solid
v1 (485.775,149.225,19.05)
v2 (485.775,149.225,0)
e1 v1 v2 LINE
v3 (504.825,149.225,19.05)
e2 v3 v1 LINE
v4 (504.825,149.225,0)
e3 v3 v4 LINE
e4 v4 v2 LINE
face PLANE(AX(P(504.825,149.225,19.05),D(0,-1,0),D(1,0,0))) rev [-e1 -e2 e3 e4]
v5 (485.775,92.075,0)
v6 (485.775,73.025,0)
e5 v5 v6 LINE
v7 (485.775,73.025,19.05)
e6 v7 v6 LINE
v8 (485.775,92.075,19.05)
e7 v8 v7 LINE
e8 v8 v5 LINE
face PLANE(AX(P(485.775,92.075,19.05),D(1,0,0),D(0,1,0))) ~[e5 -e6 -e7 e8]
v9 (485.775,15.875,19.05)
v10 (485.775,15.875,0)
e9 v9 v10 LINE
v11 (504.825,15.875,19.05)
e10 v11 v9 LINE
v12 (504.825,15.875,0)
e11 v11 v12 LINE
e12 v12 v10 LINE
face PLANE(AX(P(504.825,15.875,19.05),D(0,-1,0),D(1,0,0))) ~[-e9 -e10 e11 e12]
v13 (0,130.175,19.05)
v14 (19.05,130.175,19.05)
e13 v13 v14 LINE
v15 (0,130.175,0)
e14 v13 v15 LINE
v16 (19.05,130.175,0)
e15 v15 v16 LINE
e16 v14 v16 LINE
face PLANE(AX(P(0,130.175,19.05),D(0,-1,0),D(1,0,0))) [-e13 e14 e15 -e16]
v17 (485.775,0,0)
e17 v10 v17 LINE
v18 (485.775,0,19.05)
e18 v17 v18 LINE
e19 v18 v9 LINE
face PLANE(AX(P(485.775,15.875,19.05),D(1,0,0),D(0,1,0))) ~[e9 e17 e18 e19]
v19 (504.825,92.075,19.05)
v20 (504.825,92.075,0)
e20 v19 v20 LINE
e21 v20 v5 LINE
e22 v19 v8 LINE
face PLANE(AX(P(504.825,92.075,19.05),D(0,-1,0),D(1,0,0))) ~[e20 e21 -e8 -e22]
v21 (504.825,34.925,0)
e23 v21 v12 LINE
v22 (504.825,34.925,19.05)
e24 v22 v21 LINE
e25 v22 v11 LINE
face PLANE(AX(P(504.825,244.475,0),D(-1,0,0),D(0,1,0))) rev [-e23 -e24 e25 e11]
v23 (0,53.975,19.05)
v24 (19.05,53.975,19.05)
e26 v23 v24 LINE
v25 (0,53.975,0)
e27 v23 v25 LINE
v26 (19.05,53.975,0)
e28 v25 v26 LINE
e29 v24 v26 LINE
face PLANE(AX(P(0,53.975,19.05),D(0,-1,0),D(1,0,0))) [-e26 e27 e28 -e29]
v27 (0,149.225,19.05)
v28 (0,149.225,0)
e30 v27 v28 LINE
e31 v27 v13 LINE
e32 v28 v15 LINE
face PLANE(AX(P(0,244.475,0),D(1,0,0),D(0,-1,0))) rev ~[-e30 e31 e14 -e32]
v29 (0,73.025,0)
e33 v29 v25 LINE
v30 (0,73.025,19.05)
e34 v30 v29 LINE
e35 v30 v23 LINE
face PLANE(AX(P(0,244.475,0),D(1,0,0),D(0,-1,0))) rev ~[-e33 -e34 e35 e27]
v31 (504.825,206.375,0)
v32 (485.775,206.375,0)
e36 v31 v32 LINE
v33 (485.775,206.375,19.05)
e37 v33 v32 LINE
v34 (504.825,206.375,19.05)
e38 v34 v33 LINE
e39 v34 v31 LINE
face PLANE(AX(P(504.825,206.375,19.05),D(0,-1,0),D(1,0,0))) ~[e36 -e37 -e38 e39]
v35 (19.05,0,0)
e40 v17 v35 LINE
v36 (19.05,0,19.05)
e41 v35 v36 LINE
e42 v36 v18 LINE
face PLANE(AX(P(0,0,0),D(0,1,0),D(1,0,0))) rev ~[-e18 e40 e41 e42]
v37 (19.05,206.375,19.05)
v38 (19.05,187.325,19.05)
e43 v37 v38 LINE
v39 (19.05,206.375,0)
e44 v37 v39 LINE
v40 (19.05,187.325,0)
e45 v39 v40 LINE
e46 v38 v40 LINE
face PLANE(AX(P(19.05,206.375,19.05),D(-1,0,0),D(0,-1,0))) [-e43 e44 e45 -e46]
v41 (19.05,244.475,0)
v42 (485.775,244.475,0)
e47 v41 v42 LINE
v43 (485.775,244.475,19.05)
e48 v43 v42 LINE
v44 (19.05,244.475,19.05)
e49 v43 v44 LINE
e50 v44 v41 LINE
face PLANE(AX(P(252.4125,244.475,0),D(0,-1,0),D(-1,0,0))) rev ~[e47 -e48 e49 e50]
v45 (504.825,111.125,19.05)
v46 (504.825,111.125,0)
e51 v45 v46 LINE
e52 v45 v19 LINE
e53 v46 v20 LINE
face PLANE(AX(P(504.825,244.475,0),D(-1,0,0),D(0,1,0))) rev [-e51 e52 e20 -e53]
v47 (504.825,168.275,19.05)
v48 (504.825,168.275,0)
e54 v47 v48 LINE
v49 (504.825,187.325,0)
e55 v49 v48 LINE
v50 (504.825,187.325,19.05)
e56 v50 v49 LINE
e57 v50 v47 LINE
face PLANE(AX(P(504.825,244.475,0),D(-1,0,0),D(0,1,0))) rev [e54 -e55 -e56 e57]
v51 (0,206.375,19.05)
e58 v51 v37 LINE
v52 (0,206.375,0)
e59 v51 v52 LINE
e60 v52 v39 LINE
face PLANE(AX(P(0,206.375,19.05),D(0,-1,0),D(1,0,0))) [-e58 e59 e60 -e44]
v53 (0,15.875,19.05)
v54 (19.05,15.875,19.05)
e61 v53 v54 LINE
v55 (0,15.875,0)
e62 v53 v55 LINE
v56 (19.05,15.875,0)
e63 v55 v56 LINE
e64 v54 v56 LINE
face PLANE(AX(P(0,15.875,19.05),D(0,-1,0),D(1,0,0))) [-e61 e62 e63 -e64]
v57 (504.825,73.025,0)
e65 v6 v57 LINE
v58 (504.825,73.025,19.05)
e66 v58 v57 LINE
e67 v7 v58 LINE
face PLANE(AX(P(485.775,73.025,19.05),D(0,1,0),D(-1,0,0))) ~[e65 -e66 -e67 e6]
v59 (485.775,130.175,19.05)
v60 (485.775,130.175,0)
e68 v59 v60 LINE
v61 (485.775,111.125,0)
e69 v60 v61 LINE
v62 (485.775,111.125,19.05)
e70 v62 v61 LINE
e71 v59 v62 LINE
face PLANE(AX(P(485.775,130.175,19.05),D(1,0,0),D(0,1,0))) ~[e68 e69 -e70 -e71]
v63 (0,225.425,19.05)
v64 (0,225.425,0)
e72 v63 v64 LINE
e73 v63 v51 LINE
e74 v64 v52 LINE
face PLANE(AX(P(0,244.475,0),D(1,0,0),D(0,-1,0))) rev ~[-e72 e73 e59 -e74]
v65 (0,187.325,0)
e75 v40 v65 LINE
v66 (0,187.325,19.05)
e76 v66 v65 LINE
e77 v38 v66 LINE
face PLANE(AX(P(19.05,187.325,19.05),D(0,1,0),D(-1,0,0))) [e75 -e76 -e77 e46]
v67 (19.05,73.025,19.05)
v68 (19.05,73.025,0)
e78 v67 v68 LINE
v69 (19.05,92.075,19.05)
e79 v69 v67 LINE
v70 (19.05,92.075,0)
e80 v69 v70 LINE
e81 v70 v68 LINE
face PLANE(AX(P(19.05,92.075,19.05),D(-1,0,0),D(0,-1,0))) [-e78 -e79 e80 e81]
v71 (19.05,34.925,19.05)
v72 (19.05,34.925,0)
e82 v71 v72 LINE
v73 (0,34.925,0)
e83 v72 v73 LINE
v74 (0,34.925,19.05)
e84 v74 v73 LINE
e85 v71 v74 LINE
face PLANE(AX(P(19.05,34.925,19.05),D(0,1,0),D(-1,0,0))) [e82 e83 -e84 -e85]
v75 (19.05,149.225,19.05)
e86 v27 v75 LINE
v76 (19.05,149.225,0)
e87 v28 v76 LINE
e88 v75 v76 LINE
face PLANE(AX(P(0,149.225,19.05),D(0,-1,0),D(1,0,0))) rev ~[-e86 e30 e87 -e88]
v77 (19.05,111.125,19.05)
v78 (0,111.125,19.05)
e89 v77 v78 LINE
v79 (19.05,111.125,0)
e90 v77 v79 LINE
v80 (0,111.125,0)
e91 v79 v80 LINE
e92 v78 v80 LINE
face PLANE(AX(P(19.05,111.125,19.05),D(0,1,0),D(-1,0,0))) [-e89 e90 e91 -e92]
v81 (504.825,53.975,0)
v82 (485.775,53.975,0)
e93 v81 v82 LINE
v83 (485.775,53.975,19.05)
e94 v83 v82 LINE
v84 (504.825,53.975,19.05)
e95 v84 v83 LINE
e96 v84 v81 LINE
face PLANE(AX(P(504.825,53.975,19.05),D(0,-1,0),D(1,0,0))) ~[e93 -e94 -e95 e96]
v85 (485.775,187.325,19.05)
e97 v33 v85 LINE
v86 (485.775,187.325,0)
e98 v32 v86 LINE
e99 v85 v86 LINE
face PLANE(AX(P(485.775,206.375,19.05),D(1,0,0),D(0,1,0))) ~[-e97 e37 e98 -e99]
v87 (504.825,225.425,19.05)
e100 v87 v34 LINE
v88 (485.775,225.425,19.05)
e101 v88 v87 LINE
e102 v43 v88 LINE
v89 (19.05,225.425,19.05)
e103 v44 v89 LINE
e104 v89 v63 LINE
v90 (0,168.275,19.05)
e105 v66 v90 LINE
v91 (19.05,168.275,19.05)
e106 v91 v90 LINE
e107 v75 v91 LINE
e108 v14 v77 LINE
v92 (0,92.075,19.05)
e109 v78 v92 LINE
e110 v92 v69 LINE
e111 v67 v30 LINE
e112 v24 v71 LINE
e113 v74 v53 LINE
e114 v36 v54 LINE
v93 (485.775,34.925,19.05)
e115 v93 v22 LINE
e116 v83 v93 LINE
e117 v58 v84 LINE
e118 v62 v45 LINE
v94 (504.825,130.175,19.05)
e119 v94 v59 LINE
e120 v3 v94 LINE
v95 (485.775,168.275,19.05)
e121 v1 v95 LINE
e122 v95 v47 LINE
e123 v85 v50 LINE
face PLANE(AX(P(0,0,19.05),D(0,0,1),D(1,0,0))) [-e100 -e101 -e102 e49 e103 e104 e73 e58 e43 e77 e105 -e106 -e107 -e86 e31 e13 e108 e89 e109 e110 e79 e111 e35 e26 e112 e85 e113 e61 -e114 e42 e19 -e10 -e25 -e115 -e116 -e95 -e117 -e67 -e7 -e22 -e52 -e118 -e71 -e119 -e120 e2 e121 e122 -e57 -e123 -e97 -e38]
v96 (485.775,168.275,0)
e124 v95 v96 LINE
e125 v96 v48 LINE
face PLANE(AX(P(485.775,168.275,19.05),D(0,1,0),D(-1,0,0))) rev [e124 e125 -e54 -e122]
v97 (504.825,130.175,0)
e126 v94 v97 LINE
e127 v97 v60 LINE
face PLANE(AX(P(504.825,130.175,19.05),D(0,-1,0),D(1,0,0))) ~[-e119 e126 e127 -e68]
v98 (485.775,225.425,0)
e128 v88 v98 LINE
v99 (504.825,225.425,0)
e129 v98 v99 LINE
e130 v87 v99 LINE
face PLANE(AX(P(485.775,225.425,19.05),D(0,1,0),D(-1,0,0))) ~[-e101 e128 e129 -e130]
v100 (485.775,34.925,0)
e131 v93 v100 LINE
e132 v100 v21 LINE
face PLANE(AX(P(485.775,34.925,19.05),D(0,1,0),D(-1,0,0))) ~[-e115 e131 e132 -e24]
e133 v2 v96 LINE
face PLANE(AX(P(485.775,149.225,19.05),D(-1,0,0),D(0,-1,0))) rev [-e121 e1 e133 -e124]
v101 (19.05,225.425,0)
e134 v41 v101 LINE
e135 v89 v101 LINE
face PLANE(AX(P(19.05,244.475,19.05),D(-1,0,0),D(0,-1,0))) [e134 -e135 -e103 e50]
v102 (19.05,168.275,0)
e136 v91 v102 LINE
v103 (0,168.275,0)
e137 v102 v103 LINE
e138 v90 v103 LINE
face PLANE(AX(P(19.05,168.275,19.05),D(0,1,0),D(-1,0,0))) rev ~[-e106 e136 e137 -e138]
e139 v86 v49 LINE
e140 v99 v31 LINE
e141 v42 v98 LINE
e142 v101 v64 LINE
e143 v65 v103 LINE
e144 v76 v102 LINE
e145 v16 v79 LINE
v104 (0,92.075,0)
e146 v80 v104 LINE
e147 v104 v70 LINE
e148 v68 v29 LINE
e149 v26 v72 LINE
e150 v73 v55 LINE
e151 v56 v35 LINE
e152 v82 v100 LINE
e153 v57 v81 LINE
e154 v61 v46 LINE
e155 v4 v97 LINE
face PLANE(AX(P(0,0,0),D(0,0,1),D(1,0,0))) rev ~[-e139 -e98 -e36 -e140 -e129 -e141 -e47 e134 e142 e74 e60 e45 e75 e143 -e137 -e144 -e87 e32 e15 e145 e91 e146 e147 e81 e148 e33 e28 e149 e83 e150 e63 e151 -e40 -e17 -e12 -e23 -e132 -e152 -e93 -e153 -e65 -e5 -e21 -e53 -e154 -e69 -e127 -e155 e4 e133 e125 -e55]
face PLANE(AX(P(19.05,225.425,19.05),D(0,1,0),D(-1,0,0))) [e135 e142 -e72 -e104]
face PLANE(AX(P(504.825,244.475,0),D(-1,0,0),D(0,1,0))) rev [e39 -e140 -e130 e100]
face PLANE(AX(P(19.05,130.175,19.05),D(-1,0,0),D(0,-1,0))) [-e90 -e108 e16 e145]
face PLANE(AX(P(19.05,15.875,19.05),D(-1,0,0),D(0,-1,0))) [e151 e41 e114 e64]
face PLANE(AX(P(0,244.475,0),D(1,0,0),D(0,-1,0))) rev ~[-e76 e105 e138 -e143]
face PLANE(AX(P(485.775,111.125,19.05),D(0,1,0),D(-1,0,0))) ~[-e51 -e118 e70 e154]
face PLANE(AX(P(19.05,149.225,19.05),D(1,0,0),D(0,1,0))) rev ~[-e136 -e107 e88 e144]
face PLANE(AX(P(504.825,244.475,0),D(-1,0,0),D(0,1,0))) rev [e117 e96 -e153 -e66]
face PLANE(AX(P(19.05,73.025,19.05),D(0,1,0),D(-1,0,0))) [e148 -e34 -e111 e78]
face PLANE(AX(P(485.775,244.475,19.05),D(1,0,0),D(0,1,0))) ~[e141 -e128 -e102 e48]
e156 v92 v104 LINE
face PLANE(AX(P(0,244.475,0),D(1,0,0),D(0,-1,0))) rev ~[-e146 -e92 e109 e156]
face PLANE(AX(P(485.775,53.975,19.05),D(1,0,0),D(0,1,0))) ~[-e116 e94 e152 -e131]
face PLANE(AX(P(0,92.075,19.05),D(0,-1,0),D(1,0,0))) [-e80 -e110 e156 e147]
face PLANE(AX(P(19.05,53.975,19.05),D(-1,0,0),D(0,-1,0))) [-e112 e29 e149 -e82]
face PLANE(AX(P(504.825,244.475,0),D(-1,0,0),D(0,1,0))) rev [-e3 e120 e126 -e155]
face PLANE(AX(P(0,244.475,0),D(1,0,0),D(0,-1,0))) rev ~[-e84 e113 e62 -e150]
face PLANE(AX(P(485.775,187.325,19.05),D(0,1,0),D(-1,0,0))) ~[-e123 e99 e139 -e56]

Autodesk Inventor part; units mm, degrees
ref_plane "YZ Plane" through (0, 0, 0) normal (1, 0, 0) x (0, 1, 0)
ref_plane "XZ Plane" through (0, 0, 0) normal (0, 1, 0) x (-1, 0, 0)
ref_plane "XY Plane" through (0, 0, 0) normal (0, 0, 1) x (1, 0, 0)
sketch "Sketch1" plane through (0, 0, 0) normal (0, 0, 1) x (1, 0, 0)
  line L0 (0, 0) -> (252.4125, 0)
  line L1 (252.4125, 0) -> (252.4125, 244.475)
  line L2 (252.4125, 244.475) -> (0, 244.475)
  line L3 (0, 244.475) -> (0, 0)
  dimension "d0" = 252.4125
  dimension "d1" = 244.475
extrude "Extrusion1" add sketch "Sketch1" along normal blind 19.05
sketch "Sketch3" plane through (0, 0, 19.05) normal (0, 0, 1) x (1, 0, 0)
  line L0 (0, 0) -> (252.4125, 0) projected
  line L1 (252.4125, 244.475) -> (0, 244.475) projected
  line L2 (0, 244.475) -> (0, 0) projected
  line L3 (0, 244.475) -> (19.05, 244.475)
  line L4 (19.05, 244.475) -> (19.05, 225.425)
  line L5 (19.05, 225.425) -> (0, 225.425)
  line L6 (0, 225.425) -> (0, 244.475)
  line L7 (19.05, 168.275) -> (0, 168.275)
  line L8 (0, 168.275) -> (0, 149.225)
  line L9 (0, 149.225) -> (19.05, 149.225)
  line L10 (19.05, 149.225) -> (19.05, 168.275)
  line L11 (0, 130.175) -> (19.05, 130.175)
  line L12 (19.05, 130.175) -> (19.05, 111.125)
  line L13 (19.05, 111.125) -> (0, 111.125)
  line L14 (0, 111.125) -> (0, 130.175)
  line L15 (0, 206.375) -> (19.05, 206.375)
  line L16 (19.05, 206.375) -> (19.05, 187.325)
  line L17 (19.05, 187.325) -> (0, 187.325)
  line L18 (0, 187.325) -> (0, 206.375)
  line L19 (0, 92.075) -> (19.05, 92.075)
  line L20 (19.05, 92.075) -> (19.05, 73.025)
  line L21 (19.05, 73.025) -> (0, 73.025)
  line L22 (0, 73.025) -> (0, 92.075)
  line L23 (0, 53.975) -> (19.05, 53.975)
  line L24 (19.05, 53.975) -> (19.05, 34.925)
  line L25 (19.05, 34.925) -> (0, 34.925)
  line L26 (0, 34.925) -> (0, 53.975)
  line L27 (0, 15.875) -> (19.05, 15.875)
  line L28 (19.05, 15.875) -> (19.05, -3.175)
  line L29 (19.05, -3.175) -> (0, -3.175)
  line L30 (0, -3.175) -> (0, 15.875)
  dimension "d4" = 19.05
  dimension "d5" = 19.05
  dimension "d6" = 244.475
  dimension "d7" = 19.05
  dimension "d8" = 19.05
  dimension "d9" = 19.05
  dimension "d10" = 19.05
  dimension "d11" = 19.05
  dimension "d12" = 19.05
  dimension "d13" = 19.05
  dimension "d14" = 19.05
  dimension "d15" = 19.05
  dimension "d16" = 19.05
  dimension "d17" = 19.05
  dimension "d18" = 19.05
  dimension "d19" = 19.05
  dimension "d20" = 19.05
  dimension "d21" = 19.05
  dimension "d22" = 19.05
  dimension "d23" = 19.05
  dimension "d24" = 15.875
extrude "Extrusion2" cut sketch "Sketch3" against normal through all
mirror "Mirror1" about plane through (252.4125, 0, 0) normal (1, 0, 0)
properties part number "deep_side" material "Wood (Birch)"
